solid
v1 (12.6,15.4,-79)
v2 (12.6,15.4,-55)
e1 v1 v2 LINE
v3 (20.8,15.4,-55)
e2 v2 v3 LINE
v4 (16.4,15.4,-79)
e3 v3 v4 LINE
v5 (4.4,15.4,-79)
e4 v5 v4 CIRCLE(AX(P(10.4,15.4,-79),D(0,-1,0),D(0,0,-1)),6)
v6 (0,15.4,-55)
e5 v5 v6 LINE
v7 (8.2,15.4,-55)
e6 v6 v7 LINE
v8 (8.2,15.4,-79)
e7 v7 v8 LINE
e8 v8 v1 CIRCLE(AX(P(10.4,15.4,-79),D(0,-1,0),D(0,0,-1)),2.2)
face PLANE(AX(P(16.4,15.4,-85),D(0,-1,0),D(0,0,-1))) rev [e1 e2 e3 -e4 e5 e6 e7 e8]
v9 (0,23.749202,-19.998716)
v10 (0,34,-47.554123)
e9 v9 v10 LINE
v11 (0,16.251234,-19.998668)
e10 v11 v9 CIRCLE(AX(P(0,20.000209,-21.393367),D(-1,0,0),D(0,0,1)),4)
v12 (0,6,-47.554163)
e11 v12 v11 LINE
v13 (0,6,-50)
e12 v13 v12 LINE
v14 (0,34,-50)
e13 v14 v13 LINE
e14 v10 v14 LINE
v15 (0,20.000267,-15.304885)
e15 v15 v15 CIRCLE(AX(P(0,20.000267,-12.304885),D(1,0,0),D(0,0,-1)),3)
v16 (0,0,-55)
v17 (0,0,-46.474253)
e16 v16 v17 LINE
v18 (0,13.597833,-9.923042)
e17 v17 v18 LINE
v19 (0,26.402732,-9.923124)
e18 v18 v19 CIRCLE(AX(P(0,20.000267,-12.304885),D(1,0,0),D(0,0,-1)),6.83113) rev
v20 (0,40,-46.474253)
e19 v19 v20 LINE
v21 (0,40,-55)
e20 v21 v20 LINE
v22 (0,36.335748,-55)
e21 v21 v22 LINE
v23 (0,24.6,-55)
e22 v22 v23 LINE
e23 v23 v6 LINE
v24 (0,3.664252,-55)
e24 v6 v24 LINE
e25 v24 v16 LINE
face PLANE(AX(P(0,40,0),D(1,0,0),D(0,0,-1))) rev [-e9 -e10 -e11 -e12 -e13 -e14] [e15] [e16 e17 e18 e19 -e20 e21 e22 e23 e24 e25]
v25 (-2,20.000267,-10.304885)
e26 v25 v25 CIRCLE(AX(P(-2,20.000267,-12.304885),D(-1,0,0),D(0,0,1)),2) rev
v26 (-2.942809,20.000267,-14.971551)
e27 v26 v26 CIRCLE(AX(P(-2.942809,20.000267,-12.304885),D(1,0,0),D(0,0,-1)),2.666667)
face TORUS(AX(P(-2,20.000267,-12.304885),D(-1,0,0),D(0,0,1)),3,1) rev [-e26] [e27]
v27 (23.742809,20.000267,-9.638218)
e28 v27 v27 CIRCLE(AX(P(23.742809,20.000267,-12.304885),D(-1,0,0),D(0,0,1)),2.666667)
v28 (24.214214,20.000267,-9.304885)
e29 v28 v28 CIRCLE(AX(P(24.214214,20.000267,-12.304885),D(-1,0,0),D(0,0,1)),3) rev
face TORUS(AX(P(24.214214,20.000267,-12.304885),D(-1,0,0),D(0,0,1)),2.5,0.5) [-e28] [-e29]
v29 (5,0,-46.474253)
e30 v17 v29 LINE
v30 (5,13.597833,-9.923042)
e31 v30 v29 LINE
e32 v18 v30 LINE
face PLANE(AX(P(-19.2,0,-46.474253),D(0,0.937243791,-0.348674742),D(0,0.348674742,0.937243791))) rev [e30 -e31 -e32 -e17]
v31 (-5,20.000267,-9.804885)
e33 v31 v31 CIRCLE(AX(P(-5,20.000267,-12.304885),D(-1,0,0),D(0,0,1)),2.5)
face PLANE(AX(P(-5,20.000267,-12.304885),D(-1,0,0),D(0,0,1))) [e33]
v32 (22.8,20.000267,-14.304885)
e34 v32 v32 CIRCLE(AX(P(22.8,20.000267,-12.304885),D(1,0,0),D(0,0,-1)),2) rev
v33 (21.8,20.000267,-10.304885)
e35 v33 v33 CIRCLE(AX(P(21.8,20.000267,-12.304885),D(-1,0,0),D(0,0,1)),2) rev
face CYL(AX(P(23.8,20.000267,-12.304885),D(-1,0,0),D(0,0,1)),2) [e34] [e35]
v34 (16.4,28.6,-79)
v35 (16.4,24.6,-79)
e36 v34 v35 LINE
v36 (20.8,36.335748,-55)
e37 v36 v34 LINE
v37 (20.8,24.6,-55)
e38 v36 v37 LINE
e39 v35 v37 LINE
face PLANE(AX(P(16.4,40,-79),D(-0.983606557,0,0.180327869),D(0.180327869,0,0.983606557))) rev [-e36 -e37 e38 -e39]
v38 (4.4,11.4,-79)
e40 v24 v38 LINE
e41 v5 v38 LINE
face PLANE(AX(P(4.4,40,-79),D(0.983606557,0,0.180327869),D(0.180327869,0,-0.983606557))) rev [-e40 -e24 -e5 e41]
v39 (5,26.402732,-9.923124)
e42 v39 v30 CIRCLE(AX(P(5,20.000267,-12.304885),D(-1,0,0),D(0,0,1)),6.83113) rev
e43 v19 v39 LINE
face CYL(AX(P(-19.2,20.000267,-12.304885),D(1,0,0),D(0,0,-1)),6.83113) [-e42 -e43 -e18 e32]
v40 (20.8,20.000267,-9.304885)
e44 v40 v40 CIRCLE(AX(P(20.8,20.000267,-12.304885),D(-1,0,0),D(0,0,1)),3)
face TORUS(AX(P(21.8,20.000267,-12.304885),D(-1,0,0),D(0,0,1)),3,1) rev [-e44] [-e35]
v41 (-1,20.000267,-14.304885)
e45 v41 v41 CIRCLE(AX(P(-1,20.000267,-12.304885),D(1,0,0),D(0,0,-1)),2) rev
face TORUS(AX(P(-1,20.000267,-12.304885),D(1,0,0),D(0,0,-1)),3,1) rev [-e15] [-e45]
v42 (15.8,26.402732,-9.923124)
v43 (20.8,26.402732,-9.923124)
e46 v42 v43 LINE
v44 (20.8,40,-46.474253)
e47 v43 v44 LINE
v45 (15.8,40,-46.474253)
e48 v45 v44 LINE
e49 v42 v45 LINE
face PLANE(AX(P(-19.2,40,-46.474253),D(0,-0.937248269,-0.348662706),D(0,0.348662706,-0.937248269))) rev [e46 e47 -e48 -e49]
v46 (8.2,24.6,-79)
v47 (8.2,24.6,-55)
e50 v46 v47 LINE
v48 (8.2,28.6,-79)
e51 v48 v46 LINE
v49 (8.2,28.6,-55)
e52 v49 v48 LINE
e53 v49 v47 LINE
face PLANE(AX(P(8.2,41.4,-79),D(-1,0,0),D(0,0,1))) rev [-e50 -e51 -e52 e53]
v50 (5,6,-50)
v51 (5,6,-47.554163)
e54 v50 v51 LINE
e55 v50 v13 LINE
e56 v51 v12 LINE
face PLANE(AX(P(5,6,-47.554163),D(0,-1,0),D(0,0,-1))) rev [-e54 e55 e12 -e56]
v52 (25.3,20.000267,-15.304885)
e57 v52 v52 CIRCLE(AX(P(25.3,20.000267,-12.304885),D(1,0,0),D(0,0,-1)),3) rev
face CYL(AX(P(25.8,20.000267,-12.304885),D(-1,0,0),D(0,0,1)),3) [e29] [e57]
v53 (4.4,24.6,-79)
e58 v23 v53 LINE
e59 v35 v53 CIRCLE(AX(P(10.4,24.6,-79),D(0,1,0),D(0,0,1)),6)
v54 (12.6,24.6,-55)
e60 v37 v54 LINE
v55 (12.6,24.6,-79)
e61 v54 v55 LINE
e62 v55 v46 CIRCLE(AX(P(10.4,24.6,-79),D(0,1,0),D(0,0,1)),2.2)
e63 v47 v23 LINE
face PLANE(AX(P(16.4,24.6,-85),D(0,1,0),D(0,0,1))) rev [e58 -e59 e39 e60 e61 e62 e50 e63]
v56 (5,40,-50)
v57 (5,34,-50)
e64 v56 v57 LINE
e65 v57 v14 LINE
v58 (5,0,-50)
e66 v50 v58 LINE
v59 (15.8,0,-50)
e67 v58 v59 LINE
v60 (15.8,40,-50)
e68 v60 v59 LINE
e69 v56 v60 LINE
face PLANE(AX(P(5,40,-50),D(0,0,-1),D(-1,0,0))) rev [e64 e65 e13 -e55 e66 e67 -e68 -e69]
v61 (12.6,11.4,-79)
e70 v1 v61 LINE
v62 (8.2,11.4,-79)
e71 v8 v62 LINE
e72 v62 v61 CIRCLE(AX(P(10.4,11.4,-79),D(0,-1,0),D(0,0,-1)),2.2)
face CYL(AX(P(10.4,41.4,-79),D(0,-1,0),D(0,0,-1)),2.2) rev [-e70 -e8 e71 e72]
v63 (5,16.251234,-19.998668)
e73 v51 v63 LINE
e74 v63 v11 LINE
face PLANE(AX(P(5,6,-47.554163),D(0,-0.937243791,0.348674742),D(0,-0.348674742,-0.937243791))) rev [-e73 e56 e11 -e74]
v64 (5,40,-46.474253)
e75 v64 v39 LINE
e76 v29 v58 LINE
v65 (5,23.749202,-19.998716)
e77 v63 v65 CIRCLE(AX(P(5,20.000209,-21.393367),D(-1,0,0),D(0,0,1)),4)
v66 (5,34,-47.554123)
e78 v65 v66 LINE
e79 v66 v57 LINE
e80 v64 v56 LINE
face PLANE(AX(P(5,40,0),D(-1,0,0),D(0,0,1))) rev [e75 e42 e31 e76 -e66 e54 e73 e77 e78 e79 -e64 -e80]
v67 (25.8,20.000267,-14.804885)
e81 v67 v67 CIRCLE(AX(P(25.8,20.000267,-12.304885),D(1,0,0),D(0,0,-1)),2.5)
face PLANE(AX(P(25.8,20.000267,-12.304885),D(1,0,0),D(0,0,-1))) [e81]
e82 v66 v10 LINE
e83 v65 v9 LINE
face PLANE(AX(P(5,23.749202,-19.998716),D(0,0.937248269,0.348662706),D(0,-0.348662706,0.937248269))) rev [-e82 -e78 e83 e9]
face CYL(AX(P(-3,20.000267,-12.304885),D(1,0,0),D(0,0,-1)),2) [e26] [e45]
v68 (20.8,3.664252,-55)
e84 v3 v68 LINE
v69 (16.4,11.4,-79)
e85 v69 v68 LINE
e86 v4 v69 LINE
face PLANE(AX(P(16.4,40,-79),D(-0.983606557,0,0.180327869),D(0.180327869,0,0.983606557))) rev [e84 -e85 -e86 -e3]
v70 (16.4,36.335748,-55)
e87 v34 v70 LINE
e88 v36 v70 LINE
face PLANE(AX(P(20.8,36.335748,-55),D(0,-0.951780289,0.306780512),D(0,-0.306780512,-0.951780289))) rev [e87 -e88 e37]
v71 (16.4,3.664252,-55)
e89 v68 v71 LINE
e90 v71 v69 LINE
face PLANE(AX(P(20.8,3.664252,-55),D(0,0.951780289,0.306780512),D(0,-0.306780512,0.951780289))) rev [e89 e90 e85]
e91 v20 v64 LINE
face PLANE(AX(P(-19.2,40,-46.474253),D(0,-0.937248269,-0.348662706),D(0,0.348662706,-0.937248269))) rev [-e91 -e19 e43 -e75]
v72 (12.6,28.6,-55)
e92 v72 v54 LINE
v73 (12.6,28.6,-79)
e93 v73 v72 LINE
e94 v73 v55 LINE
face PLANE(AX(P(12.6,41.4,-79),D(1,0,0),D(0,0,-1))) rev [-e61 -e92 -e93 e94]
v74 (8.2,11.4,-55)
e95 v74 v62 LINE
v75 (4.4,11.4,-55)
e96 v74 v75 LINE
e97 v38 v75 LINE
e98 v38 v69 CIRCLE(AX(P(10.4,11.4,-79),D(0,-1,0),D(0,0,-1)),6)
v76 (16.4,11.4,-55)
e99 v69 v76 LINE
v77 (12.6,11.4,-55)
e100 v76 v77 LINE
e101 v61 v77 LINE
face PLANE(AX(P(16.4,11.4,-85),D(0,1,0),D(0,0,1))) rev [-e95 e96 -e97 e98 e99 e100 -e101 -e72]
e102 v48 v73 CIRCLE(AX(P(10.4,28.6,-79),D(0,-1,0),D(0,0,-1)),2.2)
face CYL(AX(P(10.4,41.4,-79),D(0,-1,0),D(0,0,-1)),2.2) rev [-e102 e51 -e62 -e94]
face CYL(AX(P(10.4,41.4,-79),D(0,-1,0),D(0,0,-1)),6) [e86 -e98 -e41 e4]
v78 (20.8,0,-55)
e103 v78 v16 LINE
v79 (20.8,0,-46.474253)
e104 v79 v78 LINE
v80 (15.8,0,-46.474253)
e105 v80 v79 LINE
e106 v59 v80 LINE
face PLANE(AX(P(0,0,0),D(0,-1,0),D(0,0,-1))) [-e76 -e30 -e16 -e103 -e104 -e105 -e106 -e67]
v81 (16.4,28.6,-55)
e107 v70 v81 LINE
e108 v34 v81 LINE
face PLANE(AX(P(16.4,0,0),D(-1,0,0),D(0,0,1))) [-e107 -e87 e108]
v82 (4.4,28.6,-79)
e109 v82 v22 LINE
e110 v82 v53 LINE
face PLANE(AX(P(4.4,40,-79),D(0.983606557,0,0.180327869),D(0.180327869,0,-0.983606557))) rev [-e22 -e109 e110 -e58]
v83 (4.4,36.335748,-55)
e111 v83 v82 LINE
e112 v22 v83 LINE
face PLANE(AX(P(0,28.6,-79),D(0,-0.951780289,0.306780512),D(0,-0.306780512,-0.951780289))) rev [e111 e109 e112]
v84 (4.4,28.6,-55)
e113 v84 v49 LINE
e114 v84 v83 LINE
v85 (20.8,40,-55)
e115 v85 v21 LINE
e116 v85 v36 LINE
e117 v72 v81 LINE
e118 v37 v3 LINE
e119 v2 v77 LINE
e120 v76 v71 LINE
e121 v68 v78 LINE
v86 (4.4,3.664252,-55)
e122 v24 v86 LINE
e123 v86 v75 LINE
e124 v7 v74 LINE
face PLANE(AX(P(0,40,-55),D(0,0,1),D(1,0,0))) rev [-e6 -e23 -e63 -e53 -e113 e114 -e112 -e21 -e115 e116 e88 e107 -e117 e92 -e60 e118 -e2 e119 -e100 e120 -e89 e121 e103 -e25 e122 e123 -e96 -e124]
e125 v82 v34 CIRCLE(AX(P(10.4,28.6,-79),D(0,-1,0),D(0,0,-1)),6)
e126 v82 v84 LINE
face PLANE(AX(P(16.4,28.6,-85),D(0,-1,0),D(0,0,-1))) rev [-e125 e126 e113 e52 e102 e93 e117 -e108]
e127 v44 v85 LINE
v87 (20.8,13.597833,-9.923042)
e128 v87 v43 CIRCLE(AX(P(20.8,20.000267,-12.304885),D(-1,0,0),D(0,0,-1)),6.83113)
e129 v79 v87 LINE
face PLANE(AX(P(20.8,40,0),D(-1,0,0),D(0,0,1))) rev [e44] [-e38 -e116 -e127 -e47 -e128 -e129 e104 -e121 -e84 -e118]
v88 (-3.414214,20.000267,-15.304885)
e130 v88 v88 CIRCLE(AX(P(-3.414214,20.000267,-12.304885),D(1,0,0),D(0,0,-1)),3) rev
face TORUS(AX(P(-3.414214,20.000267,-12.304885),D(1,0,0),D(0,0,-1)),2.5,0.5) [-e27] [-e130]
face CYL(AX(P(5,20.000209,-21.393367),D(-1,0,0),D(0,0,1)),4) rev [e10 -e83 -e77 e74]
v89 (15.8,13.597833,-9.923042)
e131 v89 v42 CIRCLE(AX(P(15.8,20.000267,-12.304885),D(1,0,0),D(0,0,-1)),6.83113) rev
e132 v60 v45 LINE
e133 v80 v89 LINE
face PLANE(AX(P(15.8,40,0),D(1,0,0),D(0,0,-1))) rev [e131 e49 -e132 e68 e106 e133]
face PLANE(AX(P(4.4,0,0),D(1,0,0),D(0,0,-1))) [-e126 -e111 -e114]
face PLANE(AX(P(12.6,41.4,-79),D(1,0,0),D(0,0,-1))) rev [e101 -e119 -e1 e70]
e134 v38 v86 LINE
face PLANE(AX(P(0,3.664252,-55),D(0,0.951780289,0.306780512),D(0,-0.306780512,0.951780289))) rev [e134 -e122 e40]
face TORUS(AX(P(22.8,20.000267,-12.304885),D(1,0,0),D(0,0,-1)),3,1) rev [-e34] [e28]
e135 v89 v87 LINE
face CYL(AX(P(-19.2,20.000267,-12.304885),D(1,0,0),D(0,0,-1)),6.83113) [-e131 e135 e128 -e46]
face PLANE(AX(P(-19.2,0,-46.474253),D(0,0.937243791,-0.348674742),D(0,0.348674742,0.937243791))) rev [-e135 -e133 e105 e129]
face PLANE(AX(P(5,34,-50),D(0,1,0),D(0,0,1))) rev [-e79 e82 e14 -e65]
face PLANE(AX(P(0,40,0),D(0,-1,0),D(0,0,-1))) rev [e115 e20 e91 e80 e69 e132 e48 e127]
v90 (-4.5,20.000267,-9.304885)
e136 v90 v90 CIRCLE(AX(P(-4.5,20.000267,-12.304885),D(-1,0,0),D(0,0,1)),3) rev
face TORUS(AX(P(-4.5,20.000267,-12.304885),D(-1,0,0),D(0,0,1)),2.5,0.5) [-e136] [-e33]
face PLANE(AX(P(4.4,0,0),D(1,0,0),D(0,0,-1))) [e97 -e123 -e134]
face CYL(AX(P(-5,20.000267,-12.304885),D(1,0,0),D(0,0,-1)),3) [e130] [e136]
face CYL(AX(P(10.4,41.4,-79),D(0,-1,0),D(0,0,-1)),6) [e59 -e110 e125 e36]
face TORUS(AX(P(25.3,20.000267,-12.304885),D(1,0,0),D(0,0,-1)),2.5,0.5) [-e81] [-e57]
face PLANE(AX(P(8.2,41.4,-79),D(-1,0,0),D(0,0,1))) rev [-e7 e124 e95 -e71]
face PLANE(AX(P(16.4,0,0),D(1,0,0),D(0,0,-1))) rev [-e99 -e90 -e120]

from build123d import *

# Parameters (mm, degrees)
BOSS_EXTRUDE1_DEPTH = 40
CUT_EXTRUDE1_DEPTH  = 40
SKETCH4_R           = 2
BOSS_EXTRUDE2_DEPTH = 3
SKETCH5_R           = 3
BOSS_EXTRUDE3_DEPTH = 2
BOSS_EXTRUDE4_START = 3
SKETCH6_R           = 2
BOSS_EXTRUDE4_DEPTH = 3
BOSS_EXTRUDE5_START = 2
SKETCH7_R           = 3
BOSS_EXTRUDE5_DEPTH = 2
FILLET1_R           = 1
FILLET2_R           = 0.5
CUT_EXTRUDE2_DEPTH  = 5
SKETCH10_W          = 12
SKETCH10_H          = 4
BOSS_EXTRUDE6_DEPTH = 30
CUT_EXTRUDE3_DEPTH  = 30
CUT_EXTRUDE4_DEPTH  = 30
BOSS_EXTRUDE7_DEPTH = 4.4
BOSS_EXTRUDE8_DEPTH = 4.4
CUT_EXTRUDE5_DEPTH  = 98.419915828


with BuildPart() as part:
    # Sketch1 → Boss-Extrude1 (new body)
    with BuildSketch(Plane(origin=(0, 0, 0), x_dir=(1, 0, 0), z_dir=(0, 1, 0))):
        Polygon((15.8, 0), (20.8, 0), (20.8, 55), (0, 55), (0, 0), (5, 0), (5, 50), (15.8, 50), align=None)
    extrude(amount=BOSS_EXTRUDE1_DEPTH)

    # Sketch2 → Cut-Extrude1 (cut)
    with BuildSketch(Plane(origin=(20.8, 0, 0), x_dir=(0, 0, -1), z_dir=(1, 0, 0))):
        with BuildLine():
            Line((46.47425335, 40), (9.923124303, 26.402732374))
            ThreePointArc((9.923124303, 26.402732374), (5.473754278, 20.00031105), (9.923042079, 13.597832585))
            Line((9.923042079, 13.597832585), (46.47425335, 0))
            Line((46.47425335, 0), (0, 0))
            Line((0, 0), (0, 40))
            Line((0, 40), (46.47425335, 40))
        make_face()
    extrude(amount=-CUT_EXTRUDE1_DEPTH, mode=Mode.SUBTRACT)

    # Sketch4 → Boss-Extrude2 (add)
    with BuildSketch(Plane.ZY):
        with Locations(Location((-12.304884727, 20.000267186, 0), (0, 0, 180))):
            Circle(SKETCH4_R)
    extrude(amount=BOSS_EXTRUDE2_DEPTH)

    # Sketch5 → Boss-Extrude3 (add)
    with BuildSketch(Plane.ZY.offset(3)):
        with Locations((-12.304884727, 20.000267186)):
            Circle(SKETCH5_R)
    extrude(amount=BOSS_EXTRUDE3_DEPTH)

    # Sketch6 → Boss-Extrude4 (add)
    with BuildSketch(Plane(origin=(20.8, 0, 0), x_dir=(0, 0, -1), z_dir=(1, 0, 0)).offset(BOSS_EXTRUDE4_START)):
        with Locations((12.304884727, 20.000267186)):
            Circle(SKETCH6_R)
    extrude(amount=-BOSS_EXTRUDE4_DEPTH)

    # Sketch7 → Boss-Extrude5 (add)
    with BuildSketch(Plane(origin=(23.8, 0, 0), x_dir=(0, 0, -1), z_dir=(1, 0, 0)).offset(BOSS_EXTRUDE5_START)):
        with Locations(Location((12.304884727, 20.000267186, 0), (0, 0, 180))):
            Circle(SKETCH7_R)
    extrude(amount=-BOSS_EXTRUDE5_DEPTH)

    # Fillet1
    fillet1_edges = [part.edges().sort_by_distance(p)[0] for p in [
        (0, 20.000267186, -10.304884727),
        (-3, 20.000267186, -10.304884727),
        (20.8, 20.000267186, -10.304884727),
        (23.8, 20.000267186, -10.304884727),
    ]]
    fillet(fillet1_edges, radius=FILLET1_R - 0.0001)  # a hair under: the kernel refuses the full size

    # Fillet2
    fillet2_edges = [part.edges().sort_by_distance(p)[0] for p in [
        (-3, 20.000267186, -15.304884727),
        (-5, 20.000267186, -15.304884727),
        (23.8, 20.000267186, -15.304884727),
        (25.8, 20.000267186, -15.304884727),
    ]]
    fillet(fillet2_edges, radius=FILLET2_R)

    # Sketch8 → Cut-Extrude2 (cut)
    with BuildSketch(Plane.ZY):
        with BuildLine():
            Line((-50, 34), (-50, 6))
            Line((-50, 6), (-47.554163097, 6))
            Line((-47.554163097, 6), (-19.998668132, 16.251233661))
            ThreePointArc((-19.998668132, 16.251233661), (-17.393367101, 20.000234511), (-19.998716278, 23.749201902))
            Line((-19.998716278, 23.749201902), (-47.554123321, 34))
            Line((-47.554123321, 34), (-50, 34))
        make_face()
    extrude(amount=-CUT_EXTRUDE2_DEPTH, mode=Mode.SUBTRACT)

    # Sketch10 → Boss-Extrude6 (add)
    with BuildSketch(Plane(origin=(0, 0, -55), x_dir=(-1, 0, 0), z_dir=(0, 0, -1))):
        with Locations((-10.4, 26.6)):
            Rectangle(SKETCH10_W, SKETCH10_H)
        with Locations((-10.4, 13.4)):
            Rectangle(SKETCH10_W, SKETCH10_H)
    extrude(amount=BOSS_EXTRUDE6_DEPTH)

    # Sketch11 → Cut-Extrude3 (cut)
    with BuildSketch(Plane.XZ.offset(-11.4)):
        with BuildLine():
            ThreePointArc((16.4, -79), (14.642640687, -83.242640687), (10.4, -85))
            Line((10.4, -85), (16.4, -85))
            Line((16.4, -85), (16.4, -79))
        make_face()
        with BuildLine():
            ThreePointArc((10.4, -85), (6.157359313, -83.242640687), (4.4, -79))
            Line((4.4, -79), (4.4, -85))
            Line((4.4, -85), (10.4, -85))
        make_face()
    extrude(amount=-CUT_EXTRUDE3_DEPTH, mode=Mode.SUBTRACT)

    # Sketch12 → Cut-Extrude4 (cut)
    with BuildSketch(Plane.XZ.offset(-11.4)):
        with BuildLine():
            Line((8.2, -79), (8.2, -55))
            Line((8.2, -55), (12.6, -55))
            Line((12.6, -55), (12.6, -79))
            ThreePointArc((12.6, -79), (10.4, -81.2), (8.2, -79))
        make_face()
    extrude(amount=-CUT_EXTRUDE4_DEPTH, mode=Mode.SUBTRACT)

    # Sketch13 → Boss-Extrude7 (add)
    with BuildSketch(Plane(origin=(16.4, 0, 0), x_dir=(0, 0, -1), z_dir=(1, 0, 0))):
        Polygon((55, 28.6), (55, 36.335747803), (79, 28.6), (79, 24.6), (55, 24.6), align=None)
        Polygon((55, 3.664252197), (79, 11.4), (79, 15.4), (55, 15.4), (55, 11.4), align=None)
    extrude(amount=BOSS_EXTRUDE7_DEPTH)

    # Sketch14 → Boss-Extrude8 (add)
    with BuildSketch(Plane.ZY.offset(-4.4)):
        Polygon((-55, 3.664252197), (-79, 11.4), (-79, 15.4), (-55, 15.4), align=None)
        Polygon((-79, 24.6), (-79, 28.6), (-55, 36.335747803), (-55, 24.6), align=None)
    extrude(amount=BOSS_EXTRUDE8_DEPTH)

    # Sketch15 → Cut-Extrude5 (cut, through all)
    with BuildSketch(Plane.XZ):
        Polygon((16.4, -79), (20.8, -55), (20.8, -79), align=None)
        Polygon((4.4, -79), (0, -55), (0, -79), align=None)
    extrude(amount=-CUT_EXTRUDE5_DEPTH, mode=Mode.SUBTRACT)


solid = part.part
